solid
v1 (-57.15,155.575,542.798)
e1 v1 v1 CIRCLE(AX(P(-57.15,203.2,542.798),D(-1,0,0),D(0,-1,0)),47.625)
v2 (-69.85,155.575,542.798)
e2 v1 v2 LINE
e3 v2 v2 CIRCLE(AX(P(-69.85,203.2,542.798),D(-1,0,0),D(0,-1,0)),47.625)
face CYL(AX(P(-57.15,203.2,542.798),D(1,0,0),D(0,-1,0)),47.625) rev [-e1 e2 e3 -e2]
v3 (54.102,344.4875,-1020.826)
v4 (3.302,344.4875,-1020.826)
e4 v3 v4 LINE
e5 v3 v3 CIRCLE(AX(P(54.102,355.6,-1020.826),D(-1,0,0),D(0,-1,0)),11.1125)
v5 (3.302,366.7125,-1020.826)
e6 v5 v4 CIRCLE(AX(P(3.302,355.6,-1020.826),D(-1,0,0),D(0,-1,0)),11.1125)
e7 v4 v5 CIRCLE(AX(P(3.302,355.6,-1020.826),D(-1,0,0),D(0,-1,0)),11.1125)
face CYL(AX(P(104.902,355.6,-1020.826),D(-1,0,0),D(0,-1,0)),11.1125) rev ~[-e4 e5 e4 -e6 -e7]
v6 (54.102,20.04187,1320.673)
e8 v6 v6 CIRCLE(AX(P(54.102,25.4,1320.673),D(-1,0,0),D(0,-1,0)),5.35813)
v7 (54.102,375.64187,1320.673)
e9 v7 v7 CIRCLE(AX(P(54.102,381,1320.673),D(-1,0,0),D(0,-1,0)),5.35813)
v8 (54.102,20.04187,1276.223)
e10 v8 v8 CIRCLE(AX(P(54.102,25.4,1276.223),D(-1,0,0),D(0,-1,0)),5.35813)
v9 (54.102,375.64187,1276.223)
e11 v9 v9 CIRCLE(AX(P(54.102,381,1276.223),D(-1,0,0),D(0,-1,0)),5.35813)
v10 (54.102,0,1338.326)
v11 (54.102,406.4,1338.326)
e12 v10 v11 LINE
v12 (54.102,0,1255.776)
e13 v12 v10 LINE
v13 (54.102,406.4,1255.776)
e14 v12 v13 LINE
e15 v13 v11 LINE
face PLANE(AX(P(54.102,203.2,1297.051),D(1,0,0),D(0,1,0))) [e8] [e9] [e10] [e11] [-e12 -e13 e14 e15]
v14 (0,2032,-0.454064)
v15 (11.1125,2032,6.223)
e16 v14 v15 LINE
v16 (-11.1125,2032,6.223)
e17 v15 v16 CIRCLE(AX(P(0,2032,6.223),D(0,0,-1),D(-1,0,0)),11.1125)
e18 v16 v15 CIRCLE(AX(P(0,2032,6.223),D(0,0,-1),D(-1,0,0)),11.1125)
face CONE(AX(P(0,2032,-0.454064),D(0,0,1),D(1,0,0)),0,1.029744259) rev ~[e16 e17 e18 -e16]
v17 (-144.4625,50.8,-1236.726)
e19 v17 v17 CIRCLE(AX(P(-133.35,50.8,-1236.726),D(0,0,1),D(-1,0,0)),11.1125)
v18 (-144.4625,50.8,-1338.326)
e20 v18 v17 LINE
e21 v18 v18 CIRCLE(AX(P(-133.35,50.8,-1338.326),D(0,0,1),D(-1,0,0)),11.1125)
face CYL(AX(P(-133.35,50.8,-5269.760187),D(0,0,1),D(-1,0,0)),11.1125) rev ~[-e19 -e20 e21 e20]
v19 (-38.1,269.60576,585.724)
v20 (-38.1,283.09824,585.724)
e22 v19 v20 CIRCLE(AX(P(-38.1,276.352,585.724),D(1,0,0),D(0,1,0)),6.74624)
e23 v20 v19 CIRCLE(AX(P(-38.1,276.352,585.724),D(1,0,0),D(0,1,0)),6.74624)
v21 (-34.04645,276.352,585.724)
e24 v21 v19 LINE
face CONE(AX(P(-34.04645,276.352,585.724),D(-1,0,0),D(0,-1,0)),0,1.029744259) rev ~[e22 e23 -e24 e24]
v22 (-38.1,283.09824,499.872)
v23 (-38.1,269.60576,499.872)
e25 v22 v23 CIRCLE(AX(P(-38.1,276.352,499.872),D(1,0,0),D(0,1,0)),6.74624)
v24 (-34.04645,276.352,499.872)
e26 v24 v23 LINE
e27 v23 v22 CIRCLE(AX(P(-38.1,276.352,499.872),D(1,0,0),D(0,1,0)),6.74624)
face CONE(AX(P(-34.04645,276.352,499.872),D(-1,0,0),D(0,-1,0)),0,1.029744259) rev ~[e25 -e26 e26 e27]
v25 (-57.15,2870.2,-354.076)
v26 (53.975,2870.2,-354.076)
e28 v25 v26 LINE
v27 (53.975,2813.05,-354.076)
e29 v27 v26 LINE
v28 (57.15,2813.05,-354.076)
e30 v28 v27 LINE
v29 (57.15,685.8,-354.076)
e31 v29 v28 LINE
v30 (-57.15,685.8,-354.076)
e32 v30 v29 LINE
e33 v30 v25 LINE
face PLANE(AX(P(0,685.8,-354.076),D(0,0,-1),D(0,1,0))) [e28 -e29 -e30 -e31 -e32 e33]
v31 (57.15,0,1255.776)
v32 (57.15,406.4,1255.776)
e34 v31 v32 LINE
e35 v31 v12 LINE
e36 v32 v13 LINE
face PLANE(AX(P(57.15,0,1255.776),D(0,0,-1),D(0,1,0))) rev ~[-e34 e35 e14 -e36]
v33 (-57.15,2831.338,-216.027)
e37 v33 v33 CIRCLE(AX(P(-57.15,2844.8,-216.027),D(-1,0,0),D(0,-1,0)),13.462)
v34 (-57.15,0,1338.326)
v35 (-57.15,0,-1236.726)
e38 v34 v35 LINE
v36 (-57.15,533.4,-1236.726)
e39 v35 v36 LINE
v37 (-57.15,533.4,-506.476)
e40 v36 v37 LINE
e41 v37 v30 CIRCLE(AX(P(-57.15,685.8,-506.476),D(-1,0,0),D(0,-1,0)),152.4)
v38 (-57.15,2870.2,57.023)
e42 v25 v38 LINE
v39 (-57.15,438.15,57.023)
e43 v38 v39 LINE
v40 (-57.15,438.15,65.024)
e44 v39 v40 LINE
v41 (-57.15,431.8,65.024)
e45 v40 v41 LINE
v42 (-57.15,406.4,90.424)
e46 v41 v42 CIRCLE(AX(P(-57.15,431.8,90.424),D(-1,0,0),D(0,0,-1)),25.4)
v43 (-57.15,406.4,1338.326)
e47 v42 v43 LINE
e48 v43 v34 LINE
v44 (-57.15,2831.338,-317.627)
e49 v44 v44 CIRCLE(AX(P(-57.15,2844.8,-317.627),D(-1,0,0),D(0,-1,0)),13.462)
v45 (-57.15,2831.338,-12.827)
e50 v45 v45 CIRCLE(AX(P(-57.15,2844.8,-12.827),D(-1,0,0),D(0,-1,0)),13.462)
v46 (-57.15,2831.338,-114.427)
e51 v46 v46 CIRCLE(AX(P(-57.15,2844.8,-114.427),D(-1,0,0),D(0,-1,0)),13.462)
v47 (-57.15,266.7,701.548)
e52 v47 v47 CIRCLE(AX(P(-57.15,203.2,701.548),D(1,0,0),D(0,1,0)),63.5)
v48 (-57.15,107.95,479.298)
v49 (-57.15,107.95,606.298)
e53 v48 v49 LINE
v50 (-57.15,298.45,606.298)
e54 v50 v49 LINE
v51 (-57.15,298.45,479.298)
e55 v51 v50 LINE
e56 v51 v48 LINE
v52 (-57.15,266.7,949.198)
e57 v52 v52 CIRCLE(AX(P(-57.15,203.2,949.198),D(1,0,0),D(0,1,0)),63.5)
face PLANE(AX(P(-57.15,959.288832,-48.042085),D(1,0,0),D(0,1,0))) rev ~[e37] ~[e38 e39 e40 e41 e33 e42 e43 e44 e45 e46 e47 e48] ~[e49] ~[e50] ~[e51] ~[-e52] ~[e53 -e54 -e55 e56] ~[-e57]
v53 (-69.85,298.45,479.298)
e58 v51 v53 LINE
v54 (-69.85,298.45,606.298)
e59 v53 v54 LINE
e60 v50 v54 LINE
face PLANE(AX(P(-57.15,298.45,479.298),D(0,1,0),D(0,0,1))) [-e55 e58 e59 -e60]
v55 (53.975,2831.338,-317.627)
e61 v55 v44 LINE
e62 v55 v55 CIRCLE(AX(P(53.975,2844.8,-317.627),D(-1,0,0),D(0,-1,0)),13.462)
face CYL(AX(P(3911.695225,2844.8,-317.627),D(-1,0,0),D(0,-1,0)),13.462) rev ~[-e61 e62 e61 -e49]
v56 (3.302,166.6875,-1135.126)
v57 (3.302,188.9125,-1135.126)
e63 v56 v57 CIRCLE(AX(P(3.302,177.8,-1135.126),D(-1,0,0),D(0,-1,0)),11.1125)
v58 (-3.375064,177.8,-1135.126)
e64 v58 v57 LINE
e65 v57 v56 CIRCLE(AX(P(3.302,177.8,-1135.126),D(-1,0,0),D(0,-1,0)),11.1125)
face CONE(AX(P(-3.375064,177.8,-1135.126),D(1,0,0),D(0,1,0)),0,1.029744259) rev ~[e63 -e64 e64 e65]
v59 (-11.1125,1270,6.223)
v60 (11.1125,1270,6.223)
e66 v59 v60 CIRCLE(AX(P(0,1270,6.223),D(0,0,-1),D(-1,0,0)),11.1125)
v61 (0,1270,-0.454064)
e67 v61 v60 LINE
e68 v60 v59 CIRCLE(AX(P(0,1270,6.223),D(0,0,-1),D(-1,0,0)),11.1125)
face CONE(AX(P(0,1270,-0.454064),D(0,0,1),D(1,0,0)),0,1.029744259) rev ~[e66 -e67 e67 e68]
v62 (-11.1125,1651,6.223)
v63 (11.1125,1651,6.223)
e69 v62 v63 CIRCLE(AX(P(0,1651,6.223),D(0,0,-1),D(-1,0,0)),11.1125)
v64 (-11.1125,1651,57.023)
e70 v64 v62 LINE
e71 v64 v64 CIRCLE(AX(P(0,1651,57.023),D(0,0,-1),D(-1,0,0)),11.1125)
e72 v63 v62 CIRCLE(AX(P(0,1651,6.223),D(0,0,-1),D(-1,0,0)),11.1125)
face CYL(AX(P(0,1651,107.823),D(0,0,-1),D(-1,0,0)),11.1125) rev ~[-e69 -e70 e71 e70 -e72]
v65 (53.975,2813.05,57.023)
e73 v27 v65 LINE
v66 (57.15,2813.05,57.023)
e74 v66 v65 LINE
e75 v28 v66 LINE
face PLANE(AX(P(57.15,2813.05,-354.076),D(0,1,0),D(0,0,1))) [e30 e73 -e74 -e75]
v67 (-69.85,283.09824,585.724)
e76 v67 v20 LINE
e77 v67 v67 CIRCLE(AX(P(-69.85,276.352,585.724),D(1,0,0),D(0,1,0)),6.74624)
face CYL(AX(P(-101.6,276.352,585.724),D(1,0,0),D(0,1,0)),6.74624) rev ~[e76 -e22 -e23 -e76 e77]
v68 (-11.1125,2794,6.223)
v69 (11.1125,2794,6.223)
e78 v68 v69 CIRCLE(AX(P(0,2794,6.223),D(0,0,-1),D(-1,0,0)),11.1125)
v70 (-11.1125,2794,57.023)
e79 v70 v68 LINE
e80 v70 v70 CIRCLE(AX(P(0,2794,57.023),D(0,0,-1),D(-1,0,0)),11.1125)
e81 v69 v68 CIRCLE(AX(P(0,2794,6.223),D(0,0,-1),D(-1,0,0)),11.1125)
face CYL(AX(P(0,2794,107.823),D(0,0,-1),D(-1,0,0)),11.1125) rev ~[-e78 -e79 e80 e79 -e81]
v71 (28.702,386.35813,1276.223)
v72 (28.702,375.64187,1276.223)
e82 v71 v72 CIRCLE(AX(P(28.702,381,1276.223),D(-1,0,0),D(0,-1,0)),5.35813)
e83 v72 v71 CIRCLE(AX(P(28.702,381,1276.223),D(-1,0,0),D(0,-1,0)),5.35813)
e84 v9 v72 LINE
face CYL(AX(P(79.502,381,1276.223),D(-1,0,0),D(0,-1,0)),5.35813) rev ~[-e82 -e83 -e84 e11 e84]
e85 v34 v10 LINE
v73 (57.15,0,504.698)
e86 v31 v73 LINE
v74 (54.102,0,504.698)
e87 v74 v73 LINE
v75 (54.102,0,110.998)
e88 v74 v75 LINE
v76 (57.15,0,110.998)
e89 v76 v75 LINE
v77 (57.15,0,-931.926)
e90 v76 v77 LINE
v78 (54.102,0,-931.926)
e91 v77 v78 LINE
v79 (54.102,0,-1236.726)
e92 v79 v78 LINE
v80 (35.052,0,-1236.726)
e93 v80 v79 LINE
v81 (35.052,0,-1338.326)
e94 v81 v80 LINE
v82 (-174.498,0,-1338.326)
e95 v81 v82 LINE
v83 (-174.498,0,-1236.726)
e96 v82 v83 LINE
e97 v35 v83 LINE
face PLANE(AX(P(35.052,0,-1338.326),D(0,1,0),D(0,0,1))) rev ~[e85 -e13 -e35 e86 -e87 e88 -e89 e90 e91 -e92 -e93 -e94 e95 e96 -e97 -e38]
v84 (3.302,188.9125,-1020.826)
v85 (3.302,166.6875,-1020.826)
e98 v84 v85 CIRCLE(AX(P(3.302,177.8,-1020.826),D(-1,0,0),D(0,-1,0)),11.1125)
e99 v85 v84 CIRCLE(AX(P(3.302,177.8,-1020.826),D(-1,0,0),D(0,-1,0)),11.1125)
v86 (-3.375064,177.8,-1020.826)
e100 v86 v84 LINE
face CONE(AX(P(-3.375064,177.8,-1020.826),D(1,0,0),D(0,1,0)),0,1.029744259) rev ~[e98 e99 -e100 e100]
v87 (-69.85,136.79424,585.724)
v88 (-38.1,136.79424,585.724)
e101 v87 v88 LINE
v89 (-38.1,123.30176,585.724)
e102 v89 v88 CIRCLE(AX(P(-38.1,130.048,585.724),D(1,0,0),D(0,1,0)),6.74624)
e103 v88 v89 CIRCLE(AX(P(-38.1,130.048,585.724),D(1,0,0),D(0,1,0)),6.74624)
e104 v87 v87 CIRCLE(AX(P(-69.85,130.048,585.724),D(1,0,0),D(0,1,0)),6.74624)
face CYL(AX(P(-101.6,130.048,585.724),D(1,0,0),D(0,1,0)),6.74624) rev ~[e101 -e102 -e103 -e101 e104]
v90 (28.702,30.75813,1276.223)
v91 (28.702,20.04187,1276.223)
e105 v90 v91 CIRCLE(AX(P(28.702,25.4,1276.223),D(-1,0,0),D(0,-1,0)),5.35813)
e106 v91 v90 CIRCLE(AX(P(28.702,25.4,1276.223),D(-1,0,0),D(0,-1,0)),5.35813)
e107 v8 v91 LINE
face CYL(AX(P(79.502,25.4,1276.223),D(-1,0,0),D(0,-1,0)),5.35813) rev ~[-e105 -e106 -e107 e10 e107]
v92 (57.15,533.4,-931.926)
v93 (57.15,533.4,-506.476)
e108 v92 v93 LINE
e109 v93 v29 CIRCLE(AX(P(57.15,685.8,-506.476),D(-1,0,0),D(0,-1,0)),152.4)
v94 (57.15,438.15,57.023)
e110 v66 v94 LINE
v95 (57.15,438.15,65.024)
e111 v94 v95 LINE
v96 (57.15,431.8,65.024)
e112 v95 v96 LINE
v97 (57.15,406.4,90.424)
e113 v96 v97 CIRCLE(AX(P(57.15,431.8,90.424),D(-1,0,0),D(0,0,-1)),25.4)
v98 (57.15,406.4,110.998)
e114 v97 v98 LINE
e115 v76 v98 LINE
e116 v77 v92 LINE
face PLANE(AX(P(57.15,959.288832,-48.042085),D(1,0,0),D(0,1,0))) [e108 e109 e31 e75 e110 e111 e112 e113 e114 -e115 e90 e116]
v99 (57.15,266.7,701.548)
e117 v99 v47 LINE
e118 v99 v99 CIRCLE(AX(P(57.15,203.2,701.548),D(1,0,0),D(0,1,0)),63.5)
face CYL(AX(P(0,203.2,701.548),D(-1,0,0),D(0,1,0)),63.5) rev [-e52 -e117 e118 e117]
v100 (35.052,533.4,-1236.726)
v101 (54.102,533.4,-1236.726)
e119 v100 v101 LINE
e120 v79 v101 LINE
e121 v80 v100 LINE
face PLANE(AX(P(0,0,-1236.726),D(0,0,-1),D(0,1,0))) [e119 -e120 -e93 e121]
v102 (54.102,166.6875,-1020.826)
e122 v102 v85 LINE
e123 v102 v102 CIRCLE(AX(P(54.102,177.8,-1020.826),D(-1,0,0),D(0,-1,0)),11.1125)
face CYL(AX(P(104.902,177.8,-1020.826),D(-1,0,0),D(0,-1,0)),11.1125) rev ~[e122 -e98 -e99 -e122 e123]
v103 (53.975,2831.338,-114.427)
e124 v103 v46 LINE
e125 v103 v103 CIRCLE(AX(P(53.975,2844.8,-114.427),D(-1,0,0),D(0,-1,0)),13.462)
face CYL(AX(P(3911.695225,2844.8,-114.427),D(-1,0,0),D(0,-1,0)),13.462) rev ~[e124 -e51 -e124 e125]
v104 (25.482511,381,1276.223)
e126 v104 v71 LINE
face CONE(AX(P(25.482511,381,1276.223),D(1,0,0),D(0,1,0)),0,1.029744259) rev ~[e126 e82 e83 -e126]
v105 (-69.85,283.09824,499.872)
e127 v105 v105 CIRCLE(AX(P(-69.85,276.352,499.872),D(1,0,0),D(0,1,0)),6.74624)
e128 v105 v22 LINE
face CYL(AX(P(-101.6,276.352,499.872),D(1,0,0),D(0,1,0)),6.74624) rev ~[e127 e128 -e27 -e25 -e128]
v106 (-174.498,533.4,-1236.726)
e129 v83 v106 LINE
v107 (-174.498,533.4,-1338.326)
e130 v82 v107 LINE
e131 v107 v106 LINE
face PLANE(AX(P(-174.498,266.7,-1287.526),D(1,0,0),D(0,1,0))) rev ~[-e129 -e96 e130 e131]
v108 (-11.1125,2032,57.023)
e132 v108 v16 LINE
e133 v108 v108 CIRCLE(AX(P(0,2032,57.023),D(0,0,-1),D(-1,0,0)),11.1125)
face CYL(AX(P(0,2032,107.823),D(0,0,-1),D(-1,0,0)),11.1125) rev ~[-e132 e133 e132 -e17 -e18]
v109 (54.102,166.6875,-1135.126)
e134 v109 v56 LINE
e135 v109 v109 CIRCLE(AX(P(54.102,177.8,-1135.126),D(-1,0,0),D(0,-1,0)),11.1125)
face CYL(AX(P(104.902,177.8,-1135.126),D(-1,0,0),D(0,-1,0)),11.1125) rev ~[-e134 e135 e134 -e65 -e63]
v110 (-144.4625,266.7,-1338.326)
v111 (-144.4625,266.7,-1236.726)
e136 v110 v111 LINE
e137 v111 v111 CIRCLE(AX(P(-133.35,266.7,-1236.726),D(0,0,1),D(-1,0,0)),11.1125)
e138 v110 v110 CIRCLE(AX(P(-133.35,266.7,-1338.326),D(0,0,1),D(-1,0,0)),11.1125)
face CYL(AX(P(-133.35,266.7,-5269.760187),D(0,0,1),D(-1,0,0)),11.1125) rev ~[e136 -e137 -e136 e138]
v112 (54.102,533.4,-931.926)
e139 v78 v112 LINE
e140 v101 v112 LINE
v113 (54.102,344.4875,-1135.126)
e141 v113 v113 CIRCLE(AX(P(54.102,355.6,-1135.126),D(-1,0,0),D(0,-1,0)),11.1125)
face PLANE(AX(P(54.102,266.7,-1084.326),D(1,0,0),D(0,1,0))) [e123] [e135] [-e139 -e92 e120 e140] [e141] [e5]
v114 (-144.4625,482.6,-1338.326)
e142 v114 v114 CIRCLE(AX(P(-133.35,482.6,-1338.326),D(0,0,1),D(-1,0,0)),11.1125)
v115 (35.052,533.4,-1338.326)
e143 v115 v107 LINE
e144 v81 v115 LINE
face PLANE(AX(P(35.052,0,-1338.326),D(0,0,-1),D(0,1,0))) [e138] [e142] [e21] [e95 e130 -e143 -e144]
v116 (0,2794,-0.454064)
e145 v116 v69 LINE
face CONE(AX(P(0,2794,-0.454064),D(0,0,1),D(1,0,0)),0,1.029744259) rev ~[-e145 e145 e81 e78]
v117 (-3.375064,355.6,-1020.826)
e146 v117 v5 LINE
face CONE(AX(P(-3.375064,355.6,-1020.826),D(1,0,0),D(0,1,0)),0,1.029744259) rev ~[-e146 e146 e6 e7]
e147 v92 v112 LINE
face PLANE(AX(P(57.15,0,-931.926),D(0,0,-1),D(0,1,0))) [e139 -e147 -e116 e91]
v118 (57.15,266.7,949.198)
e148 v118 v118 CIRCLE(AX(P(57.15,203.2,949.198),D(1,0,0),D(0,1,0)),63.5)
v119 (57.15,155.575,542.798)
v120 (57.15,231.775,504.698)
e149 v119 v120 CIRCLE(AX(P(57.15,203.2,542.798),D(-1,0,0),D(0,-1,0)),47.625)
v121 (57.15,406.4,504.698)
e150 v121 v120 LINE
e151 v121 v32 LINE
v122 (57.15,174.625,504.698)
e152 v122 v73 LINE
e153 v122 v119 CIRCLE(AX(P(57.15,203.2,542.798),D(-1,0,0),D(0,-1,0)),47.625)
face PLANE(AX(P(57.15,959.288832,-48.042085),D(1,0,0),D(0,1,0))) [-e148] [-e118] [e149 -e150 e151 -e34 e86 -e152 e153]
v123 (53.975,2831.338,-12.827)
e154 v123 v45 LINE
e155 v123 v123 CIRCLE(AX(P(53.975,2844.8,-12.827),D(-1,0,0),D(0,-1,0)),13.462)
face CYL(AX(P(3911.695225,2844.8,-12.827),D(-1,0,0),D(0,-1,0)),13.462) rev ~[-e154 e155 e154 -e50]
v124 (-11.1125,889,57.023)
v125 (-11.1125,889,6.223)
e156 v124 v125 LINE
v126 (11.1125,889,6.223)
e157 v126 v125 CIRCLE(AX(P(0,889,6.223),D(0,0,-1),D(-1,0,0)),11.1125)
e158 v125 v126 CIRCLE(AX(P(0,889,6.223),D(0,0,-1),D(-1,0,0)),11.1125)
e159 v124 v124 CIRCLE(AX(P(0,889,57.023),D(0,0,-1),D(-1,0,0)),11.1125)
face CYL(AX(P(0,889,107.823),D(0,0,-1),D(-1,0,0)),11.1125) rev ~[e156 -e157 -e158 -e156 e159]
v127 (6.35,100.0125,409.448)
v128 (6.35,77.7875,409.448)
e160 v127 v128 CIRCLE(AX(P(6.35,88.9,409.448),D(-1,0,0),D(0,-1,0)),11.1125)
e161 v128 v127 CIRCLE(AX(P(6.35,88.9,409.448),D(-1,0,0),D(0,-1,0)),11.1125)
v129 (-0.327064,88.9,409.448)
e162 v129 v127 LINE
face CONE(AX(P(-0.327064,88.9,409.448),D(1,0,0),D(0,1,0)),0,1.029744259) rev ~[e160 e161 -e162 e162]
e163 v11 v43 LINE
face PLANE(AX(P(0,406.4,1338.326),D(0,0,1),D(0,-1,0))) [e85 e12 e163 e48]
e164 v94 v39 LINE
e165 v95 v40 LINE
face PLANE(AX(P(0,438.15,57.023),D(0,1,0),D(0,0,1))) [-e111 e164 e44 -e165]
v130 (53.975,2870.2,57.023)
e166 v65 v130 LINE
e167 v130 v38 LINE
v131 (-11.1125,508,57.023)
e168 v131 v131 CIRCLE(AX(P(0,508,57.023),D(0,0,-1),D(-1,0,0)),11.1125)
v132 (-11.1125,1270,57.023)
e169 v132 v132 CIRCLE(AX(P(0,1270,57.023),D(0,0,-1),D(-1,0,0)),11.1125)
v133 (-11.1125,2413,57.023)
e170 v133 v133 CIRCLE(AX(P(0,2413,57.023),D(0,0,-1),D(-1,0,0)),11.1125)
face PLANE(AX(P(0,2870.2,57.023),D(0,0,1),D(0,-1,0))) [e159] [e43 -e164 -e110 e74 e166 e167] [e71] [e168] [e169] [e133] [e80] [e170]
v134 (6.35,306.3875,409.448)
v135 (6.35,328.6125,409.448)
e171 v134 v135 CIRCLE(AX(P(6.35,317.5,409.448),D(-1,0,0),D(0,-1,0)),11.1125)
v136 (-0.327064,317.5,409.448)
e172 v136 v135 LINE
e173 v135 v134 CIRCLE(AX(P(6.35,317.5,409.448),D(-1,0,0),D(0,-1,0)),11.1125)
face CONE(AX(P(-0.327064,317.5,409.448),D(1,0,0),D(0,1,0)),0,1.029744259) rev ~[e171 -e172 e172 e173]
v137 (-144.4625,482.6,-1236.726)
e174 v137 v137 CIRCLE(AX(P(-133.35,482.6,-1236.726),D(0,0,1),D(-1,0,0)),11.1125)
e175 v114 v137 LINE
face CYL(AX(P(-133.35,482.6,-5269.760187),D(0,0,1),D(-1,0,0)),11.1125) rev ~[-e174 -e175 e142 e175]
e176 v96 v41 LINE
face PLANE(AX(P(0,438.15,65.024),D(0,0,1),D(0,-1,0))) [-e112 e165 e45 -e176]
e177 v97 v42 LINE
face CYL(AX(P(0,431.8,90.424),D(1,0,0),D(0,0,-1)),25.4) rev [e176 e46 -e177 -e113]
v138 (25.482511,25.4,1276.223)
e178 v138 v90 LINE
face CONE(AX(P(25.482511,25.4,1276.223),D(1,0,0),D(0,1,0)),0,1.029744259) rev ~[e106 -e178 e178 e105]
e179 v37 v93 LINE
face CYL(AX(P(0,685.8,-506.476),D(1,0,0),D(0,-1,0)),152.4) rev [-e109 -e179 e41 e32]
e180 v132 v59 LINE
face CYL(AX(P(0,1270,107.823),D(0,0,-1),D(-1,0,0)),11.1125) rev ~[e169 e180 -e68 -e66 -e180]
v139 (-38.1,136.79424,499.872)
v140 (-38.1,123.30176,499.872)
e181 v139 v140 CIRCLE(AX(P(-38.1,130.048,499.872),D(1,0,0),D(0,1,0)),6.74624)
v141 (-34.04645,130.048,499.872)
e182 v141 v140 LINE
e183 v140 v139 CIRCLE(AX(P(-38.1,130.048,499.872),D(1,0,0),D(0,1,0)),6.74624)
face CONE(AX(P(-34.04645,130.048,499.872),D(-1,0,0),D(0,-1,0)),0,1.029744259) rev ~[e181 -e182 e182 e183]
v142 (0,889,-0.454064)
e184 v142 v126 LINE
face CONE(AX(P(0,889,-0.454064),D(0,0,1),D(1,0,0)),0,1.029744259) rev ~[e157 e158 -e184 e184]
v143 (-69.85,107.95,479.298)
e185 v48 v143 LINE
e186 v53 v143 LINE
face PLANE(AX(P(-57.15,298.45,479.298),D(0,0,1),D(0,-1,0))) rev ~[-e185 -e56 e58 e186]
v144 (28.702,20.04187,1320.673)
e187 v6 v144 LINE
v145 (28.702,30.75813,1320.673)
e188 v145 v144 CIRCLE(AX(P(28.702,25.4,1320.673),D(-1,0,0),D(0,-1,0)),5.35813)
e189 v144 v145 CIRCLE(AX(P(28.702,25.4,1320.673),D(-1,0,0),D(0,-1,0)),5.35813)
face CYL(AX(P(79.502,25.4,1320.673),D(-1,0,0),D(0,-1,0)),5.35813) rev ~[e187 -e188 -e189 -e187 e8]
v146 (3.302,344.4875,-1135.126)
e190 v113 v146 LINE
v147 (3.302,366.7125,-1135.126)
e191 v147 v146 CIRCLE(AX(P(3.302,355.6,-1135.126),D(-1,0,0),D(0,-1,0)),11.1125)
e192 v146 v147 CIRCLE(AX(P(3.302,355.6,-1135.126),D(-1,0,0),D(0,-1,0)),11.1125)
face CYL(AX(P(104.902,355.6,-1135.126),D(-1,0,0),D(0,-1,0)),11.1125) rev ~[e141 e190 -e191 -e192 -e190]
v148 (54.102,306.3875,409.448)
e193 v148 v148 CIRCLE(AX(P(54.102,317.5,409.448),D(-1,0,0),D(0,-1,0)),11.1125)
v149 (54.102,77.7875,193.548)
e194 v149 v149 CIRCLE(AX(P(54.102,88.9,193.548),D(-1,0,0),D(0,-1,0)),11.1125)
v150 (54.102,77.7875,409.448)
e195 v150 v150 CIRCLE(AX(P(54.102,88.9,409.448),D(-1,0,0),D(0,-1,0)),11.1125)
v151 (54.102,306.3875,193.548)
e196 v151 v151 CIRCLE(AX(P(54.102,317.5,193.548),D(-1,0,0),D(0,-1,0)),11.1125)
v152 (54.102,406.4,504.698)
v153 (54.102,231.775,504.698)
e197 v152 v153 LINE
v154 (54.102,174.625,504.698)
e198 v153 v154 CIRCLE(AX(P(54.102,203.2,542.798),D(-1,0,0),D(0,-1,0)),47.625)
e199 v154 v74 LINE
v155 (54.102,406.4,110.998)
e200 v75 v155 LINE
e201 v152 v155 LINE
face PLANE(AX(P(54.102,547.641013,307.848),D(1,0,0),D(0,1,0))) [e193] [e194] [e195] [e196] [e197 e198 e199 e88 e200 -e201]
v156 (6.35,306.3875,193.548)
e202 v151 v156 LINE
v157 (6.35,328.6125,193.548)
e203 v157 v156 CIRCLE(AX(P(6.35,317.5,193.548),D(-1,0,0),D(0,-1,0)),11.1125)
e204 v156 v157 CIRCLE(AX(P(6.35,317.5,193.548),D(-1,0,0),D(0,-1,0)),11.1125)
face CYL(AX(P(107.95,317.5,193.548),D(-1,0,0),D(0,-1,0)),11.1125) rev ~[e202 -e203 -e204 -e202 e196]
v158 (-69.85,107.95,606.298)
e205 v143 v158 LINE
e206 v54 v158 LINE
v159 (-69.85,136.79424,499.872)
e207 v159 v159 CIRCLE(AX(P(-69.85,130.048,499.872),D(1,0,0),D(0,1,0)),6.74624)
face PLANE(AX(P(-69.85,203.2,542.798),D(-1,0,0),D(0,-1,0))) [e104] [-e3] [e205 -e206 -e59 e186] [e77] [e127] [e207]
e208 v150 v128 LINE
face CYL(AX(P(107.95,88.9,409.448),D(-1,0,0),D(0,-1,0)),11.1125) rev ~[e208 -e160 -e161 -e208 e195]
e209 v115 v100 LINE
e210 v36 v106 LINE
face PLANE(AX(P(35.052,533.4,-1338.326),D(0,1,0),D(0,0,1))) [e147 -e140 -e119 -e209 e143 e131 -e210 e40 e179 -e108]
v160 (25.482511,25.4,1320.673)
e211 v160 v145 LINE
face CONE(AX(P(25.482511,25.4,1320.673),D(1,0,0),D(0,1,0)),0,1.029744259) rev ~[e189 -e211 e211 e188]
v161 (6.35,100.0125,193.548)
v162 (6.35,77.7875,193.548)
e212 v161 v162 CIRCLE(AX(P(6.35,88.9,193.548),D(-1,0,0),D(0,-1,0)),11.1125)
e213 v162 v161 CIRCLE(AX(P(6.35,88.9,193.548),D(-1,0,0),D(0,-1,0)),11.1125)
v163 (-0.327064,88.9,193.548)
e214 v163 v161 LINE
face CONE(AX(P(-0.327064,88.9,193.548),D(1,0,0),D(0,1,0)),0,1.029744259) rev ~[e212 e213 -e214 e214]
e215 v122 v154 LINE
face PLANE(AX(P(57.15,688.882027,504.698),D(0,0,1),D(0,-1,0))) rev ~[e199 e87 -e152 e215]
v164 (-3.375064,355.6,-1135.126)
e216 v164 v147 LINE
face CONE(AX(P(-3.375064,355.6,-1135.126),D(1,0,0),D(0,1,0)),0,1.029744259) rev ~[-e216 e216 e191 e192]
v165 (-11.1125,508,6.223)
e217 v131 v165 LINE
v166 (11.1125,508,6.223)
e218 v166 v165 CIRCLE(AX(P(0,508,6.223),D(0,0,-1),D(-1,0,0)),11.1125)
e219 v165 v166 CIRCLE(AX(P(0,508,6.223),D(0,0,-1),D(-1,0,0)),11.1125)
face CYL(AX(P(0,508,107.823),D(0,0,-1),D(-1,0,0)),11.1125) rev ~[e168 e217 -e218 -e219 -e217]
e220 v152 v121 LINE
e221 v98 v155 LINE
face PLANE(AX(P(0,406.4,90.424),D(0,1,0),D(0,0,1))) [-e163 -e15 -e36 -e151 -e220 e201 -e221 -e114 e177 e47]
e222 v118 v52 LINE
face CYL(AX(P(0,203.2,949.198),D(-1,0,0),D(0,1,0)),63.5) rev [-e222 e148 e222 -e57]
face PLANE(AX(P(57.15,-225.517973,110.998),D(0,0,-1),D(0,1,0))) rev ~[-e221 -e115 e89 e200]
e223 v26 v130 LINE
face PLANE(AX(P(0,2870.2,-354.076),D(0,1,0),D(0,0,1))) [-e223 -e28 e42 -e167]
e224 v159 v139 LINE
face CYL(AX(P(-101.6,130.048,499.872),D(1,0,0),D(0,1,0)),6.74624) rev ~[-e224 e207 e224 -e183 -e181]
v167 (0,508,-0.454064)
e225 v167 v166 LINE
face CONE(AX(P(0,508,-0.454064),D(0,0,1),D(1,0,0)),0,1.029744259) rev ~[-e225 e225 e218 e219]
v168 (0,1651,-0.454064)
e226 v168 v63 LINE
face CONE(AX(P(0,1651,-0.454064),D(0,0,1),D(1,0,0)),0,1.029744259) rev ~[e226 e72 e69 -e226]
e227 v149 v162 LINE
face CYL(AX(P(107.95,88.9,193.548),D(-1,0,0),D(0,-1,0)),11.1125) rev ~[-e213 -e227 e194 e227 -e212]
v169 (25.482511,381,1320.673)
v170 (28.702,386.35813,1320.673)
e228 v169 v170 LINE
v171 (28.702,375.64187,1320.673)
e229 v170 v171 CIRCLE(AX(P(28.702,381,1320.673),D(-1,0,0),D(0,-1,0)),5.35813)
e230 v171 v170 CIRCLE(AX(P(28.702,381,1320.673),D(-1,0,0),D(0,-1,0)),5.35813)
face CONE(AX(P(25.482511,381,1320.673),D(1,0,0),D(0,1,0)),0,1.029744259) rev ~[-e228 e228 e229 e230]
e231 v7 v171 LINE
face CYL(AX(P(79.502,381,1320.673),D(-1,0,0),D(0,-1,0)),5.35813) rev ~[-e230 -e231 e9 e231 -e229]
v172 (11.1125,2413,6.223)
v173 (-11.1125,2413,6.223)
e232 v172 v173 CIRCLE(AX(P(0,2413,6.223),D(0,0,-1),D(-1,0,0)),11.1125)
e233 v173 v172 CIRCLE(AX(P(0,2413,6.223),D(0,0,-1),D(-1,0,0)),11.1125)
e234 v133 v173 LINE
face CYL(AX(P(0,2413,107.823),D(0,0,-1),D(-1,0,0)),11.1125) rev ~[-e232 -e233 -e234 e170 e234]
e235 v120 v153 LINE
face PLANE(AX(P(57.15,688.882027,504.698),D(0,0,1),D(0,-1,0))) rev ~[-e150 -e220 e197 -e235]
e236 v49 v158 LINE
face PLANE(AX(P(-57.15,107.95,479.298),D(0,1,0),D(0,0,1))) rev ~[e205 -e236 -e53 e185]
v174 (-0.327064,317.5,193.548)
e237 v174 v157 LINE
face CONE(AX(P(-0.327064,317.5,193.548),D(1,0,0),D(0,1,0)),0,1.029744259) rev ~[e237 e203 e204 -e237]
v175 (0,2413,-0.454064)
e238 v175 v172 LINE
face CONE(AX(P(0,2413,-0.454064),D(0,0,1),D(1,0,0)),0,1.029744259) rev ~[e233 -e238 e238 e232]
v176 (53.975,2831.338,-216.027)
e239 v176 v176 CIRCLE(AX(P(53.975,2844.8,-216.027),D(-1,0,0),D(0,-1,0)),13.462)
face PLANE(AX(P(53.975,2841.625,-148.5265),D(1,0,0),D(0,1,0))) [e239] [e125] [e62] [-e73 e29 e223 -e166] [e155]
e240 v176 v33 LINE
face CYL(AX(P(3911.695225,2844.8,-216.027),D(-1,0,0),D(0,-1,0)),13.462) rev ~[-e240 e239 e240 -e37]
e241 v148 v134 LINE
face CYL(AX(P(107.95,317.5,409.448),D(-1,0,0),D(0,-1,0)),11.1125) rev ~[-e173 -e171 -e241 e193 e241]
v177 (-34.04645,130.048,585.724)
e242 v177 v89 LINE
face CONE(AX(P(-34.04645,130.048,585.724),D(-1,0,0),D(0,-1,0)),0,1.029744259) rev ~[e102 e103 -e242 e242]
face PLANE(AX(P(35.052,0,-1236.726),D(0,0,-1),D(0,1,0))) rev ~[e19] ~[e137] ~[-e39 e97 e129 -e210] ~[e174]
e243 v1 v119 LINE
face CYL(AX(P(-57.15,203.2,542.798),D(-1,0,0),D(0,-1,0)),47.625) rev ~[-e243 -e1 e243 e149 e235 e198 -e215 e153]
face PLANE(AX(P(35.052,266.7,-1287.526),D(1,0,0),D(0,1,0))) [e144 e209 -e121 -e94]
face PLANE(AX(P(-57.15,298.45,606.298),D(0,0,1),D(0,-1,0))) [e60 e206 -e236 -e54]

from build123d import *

# Parameters (mm, degrees)
F0_R      = 63.5
F1_DEPTH  = 57.15
F2_W      = 406.4
F2_H      = 82.55
F3_DEPTH  = 3.048
F5_D      = 10.71626
F5_DEPTH  = 25.4
F5_TIP    = 3.2194893086
F8_D      = 22.225
F8_DEPTH  = 50.8
F8_TIP    = 6.6770636289
F9_W      = 57.15
F9_H      = 411.099
F10_DEPTH = 3.175
F12_D     = 26.924
F14_D     = 22.225
F14_DEPTH = 50.8
F14_TIP   = 6.6770636289
F15_W     = 533.4
F15_H     = 304.8
F16_DEPTH = 3.048
F18_D     = 22.225
F18_DEPTH = 50.8
F18_TIP   = 6.6770636289
F20_W     = 533.4
F20_H     = 101.6
F21_DEPTH = 209.55
F23_D     = 22.225
F24_W     = 282.4820266962
F24_H     = 393.7
F24_W_2   = 406.4
F24_R     = 11.1125
F24_W_3   = 225.5179733038
F25_DEPTH = 3.048
F26_R     = 47.625
F27_DEPTH = 114.301
F28_W     = 190.5
F28_H     = 127
F28_R     = 47.625
F29_DEPTH = 12.7
F31_D     = 13.49248
F31_DEPTH = 31.75
F31_TIP   = 4.0535499425


with BuildPart() as f1:
    # F0 (on Right) → F1 (new body, symmetric)
    with BuildSketch(Plane.YZ):
        with BuildLine():
            Line((406.4, 1338.326), (0, 1338.326))
            Line((0, 1338.326), (0, 65.024))
            Line((0, 65.024), (0, -354.076))
            Line((0, -354.076), (0, -642.7685022354))
            Line((0, -642.7685022354), (0, -1236.726))
            Line((0, -1236.726), (533.4, -1236.726))
            Line((533.4, -1236.726), (533.4, -506.476))
            ThreePointArc((533.4, -506.476), (578.0369265472, -398.7129265472), (685.8, -354.076))
            Line((685.8, -354.076), (2870.2, -354.076))
            Line((2870.2, -354.076), (2870.2, 57.023))
            Line((2870.2, 57.023), (438.15, 57.023))
            Line((438.15, 57.023), (438.15, 65.024))
            Line((438.15, 65.024), (431.8, 65.024))
            ThreePointArc((431.8, 65.024), (413.8394877579, 72.4634877579), (406.4, 90.424))
            Line((406.4, 90.424), (406.4, 1338.326))
        make_face()
        with Locations((203.2, 701.548)):
            Circle(F0_R, mode=Mode.SUBTRACT)
        with Locations((203.2, 949.198)):
            Circle(F0_R, mode=Mode.SUBTRACT)
    extrude(amount=F1_DEPTH, both=True)

    # F2 (on face) → F3 (cut)
    with BuildSketch(Plane.YZ.offset(57.15)):
        with Locations((203.2, 1297.051)):
            Rectangle(F2_W, F2_H)
    extrude(amount=-F3_DEPTH, mode=Mode.SUBTRACT)

    # F5
    with Locations(Plane.YZ.offset(54.102)):
        with Locations((25.4, 1320.673), (25.4, 1276.223), (381, 1320.673), (381, 1276.223)):
            Hole(F5_D / 2, depth=F5_DEPTH)
            with Locations((0, 0, -(F5_DEPTH + F5_TIP / 2))):  # 118° drill point
                Cone(0, F5_D / 2, F5_TIP, mode=Mode.SUBTRACT)

    # F8
    with Locations(Plane.YZ.offset(57.15)):
        with Locations((88.9, 409.448), (317.5, 409.448), (88.9, 193.548), (317.5, 193.548)):
            Hole(F8_D / 2, depth=F8_DEPTH)
            with Locations((0, 0, -(F8_DEPTH + F8_TIP / 2))):  # 118° drill point
                Cone(0, F8_D / 2, F8_TIP, mode=Mode.SUBTRACT)

    # F9 (on face) → F10 (cut)
    with BuildSketch(Plane.YZ.offset(57.15)):
        with Locations((2841.625, -148.5265)):
            Rectangle(F9_W, F9_H)
    extrude(amount=-F10_DEPTH, mode=Mode.SUBTRACT)

    # F12 (through all)
    with Locations(Plane.YZ.offset(53.975)):
        with Locations((2844.8, -12.827), (2844.8, -114.427), (2844.8, -216.027), (2844.8, -317.627)):
            Hole(F12_D / 2)

    # F14
    with Locations(Plane.XY.offset(57.023)):
        with Locations((0, 508), (0, 889), (0, 1270), (0, 1651), (0, 2032), (0, 2413), (0, 2794)):
            Hole(F14_D / 2, depth=F14_DEPTH)
            with Locations((0, 0, -(F14_DEPTH + F14_TIP / 2))):  # 118° drill point
                Cone(0, F14_D / 2, F14_TIP, mode=Mode.SUBTRACT)

    # F15 (on face) → F16 (cut)
    with BuildSketch(Plane.YZ.offset(57.15)):
        with Locations((266.7, -1084.326)):
            Rectangle(F15_W, F15_H)
    extrude(amount=-F16_DEPTH, mode=Mode.SUBTRACT)

    # F18
    with Locations(Plane.YZ.offset(54.102)):
        with Locations((177.8, -1020.826), (355.6, -1020.826), (355.6, -1135.126), (177.8, -1135.126)):
            Hole(F18_D / 2, depth=F18_DEPTH)
            with Locations((0, 0, -(F18_DEPTH + F18_TIP / 2))):  # 118° drill point
                Cone(0, F18_D / 2, F18_TIP, mode=Mode.SUBTRACT)

    # F20 (on offset) → F21 (join)
    with BuildSketch(Plane.YZ.offset(35.052)):
        with Locations((266.7, -1287.526)):
            Rectangle(F20_W, F20_H)
    extrude(amount=-F21_DEPTH)

    # F23 (through all)
    with Locations(Plane(origin=(0, 0, -1338.326), x_dir=(1, 0, 0), z_dir=(0, 0, -1))):
        with Locations((-133.35, -482.6), (-133.35, -266.7), (-133.35, -50.8)):
            Hole(F23_D / 2)

    # F24 (on face) → F25 (cut)
    with BuildSketch(Plane.YZ.offset(57.15)):
        with Locations((547.6410133481, 307.848)):
            Rectangle(F24_W, F24_H)
        with Locations((203.2, 307.848)):
            Rectangle(F24_W_2, F24_H)
        with Locations((88.9, 193.548)):
            Circle(F24_R, mode=Mode.SUBTRACT)
        with Locations((88.9, 409.448)):
            Circle(F24_R, mode=Mode.SUBTRACT)
        with Locations((317.5, 193.548)):
            Circle(F24_R, mode=Mode.SUBTRACT)
        with Locations((317.5, 409.448)):
            Circle(F24_R, mode=Mode.SUBTRACT)
        with Locations((-112.7589866519, 307.848)):
            Rectangle(F24_W_3, F24_H)
    extrude(amount=-F25_DEPTH, mode=Mode.SUBTRACT)

    # F26 (on face) → F27 (cut, through all)
    with BuildSketch(Plane(origin=(-57.15, 0, 0), x_dir=(0, -1, 0), z_dir=(-1, 0, 0))):
        with Locations((-203.2, 542.798)):
            Circle(F26_R)
    extrude(amount=-F27_DEPTH, mode=Mode.SUBTRACT)

    # F28 (on face) → F29 (join)
    with BuildSketch(Plane(origin=(-57.15, 0, 0), x_dir=(0, -1, 0), z_dir=(-1, 0, 0))):
        with Locations((-203.2, 542.798)):
            Rectangle(F28_W, F28_H)
        with Locations((-203.2, 542.798)):
            Circle(F28_R, mode=Mode.SUBTRACT)
    extrude(amount=F29_DEPTH)

    # F31
    with Locations(Plane(origin=(-69.85, 0, 0), x_dir=(0, -1, 0), z_dir=(-1, 0, 0))):
        with Locations((-276.352, 585.724), (-130.048, 585.724), (-130.048, 499.872), (-276.352, 499.872)):
            Hole(F31_D / 2, depth=F31_DEPTH)
            with Locations((0, 0, -(F31_DEPTH + F31_TIP / 2))):  # 118° drill point
                Cone(0, F31_D / 2, F31_TIP, mode=Mode.SUBTRACT)


solid = f1.part
